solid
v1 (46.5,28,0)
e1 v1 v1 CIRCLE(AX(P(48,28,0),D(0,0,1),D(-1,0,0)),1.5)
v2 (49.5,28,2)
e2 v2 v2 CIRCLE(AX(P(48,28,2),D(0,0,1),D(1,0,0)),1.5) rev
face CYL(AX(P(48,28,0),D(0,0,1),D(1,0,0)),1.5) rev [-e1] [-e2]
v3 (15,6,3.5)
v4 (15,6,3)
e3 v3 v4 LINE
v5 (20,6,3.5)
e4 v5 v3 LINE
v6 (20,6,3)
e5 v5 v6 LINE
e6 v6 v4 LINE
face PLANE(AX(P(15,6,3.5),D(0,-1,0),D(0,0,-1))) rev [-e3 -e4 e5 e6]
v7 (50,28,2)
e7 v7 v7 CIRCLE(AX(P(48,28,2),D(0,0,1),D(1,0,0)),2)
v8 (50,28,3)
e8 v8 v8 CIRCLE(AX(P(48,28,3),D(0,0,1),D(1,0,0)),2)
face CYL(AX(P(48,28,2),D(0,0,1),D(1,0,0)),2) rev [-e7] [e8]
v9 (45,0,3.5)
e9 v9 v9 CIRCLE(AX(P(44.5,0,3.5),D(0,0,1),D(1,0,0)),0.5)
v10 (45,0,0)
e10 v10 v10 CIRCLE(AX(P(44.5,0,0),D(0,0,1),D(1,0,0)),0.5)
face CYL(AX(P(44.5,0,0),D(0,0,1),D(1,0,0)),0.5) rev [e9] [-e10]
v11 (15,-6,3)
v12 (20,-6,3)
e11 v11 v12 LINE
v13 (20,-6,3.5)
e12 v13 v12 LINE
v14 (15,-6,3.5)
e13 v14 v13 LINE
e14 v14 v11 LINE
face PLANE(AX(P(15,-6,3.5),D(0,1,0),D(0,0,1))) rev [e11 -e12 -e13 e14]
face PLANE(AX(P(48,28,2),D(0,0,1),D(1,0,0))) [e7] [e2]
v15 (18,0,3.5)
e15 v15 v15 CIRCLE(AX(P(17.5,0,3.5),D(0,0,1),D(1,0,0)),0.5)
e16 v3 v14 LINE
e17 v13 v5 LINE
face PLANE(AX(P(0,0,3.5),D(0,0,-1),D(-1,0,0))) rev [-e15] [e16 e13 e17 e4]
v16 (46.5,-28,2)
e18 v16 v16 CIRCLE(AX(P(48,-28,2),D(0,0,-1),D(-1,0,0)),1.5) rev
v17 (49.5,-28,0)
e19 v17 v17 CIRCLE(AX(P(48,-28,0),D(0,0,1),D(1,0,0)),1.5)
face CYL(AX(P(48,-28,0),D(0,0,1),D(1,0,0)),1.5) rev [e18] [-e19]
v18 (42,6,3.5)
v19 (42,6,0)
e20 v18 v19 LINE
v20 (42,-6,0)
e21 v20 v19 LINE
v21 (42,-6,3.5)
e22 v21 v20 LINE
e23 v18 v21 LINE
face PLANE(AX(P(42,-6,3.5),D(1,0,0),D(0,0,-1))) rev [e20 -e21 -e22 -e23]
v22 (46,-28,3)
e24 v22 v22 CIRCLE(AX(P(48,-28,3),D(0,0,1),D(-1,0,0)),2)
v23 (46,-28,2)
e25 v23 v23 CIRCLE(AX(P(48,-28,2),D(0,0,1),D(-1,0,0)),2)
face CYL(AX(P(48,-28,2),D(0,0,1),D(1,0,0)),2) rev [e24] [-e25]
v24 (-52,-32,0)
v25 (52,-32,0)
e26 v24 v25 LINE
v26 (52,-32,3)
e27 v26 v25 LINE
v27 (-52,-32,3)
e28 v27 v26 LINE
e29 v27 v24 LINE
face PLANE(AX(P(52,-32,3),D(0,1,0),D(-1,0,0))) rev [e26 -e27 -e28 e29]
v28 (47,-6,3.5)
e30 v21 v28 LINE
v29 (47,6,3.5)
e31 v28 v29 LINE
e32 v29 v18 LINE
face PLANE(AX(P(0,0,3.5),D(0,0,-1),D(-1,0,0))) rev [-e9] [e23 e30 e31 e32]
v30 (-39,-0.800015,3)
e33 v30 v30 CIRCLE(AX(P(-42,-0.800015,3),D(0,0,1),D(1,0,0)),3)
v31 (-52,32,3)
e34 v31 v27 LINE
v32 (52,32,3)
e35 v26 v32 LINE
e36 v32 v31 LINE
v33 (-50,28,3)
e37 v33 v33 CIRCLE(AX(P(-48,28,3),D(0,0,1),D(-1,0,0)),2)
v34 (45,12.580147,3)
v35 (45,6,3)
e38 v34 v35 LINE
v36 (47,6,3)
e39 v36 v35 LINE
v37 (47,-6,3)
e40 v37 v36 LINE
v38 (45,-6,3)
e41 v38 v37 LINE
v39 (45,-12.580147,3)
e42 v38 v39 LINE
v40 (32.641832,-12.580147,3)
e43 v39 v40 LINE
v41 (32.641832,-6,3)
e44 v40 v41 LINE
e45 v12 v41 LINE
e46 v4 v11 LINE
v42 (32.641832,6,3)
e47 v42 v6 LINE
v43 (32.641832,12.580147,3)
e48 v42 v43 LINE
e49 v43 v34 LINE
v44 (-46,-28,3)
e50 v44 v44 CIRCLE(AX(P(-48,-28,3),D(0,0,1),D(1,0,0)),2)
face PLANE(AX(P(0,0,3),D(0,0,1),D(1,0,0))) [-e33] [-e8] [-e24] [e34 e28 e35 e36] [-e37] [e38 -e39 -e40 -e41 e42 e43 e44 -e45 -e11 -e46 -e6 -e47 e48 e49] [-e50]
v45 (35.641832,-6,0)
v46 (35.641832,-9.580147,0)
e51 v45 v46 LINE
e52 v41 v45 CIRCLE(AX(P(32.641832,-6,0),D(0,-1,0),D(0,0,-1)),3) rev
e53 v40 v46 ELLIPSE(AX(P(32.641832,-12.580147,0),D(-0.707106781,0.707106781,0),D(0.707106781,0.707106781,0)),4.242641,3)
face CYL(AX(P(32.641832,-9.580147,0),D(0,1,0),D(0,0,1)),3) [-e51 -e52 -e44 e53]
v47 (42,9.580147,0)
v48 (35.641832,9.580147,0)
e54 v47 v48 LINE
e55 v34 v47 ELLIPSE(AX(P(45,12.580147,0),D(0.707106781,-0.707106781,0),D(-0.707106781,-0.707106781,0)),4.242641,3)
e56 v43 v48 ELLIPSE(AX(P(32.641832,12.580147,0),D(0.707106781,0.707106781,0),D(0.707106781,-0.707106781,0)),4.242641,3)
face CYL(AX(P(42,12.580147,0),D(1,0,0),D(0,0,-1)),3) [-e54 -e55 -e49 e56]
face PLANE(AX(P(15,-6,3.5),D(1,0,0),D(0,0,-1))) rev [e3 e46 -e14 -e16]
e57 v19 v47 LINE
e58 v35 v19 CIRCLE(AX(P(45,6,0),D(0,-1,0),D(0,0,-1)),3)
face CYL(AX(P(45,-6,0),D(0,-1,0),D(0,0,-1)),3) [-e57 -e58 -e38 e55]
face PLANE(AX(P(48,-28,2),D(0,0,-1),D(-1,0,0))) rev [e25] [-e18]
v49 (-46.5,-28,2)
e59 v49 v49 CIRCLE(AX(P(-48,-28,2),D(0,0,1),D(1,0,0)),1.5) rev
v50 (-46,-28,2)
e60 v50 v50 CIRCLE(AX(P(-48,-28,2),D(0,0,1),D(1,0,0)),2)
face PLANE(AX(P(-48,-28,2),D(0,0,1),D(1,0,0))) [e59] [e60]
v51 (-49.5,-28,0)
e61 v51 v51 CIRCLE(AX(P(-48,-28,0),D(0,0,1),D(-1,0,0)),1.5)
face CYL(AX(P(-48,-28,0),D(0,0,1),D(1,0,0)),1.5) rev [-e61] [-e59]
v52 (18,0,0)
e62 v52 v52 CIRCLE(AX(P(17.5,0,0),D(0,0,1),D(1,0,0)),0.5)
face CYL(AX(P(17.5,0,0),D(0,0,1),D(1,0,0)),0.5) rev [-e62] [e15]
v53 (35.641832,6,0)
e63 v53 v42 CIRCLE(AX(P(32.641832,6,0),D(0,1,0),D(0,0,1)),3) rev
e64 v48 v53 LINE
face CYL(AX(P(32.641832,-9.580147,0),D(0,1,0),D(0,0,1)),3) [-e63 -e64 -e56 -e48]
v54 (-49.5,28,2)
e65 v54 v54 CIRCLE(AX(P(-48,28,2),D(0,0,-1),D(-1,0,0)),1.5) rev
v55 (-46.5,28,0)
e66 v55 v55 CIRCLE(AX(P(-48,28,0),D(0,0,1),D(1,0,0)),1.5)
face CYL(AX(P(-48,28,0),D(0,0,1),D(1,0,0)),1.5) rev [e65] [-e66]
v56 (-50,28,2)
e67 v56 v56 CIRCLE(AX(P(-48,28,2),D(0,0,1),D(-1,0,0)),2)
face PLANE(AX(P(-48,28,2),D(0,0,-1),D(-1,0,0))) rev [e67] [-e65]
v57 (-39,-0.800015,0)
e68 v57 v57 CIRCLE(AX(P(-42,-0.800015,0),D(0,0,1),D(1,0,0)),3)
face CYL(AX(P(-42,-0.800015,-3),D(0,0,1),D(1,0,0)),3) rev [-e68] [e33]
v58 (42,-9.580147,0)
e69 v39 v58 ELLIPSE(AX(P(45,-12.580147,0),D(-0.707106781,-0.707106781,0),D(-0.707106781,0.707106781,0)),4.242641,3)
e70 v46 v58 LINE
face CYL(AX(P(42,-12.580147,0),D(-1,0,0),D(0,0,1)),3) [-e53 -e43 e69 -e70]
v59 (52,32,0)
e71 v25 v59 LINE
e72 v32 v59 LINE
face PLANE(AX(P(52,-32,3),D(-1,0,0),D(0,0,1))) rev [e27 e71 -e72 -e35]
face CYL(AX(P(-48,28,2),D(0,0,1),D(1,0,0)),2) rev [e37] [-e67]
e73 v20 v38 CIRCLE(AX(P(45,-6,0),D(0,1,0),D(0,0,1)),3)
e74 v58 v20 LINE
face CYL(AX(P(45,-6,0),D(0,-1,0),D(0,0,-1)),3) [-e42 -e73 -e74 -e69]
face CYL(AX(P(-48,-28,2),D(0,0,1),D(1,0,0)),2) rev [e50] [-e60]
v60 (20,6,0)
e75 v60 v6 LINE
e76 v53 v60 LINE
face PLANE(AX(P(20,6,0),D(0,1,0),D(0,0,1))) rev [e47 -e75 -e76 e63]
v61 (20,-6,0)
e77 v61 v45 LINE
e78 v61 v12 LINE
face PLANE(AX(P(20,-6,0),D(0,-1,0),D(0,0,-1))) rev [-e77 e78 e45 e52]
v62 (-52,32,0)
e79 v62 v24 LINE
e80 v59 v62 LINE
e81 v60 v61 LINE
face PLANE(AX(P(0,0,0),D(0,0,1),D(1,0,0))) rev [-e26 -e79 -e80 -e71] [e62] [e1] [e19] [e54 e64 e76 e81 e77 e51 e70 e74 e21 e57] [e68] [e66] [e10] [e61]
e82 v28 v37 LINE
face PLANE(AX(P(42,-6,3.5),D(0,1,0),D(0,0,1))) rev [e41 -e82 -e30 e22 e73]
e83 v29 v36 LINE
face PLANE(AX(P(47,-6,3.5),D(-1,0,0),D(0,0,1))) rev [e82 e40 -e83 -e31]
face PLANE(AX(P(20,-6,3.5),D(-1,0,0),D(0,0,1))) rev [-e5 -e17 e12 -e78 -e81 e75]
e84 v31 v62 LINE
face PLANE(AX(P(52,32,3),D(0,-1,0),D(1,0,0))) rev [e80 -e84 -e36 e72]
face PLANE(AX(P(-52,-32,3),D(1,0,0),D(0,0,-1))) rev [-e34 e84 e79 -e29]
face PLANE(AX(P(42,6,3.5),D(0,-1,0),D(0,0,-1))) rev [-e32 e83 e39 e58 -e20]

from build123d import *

# Parameters (mm, degrees)
SKETCH_1_W           = 104
SKETCH_1_H           = 64
EXTRUDE_1_DEPTH      = 3
SKETCH_2_R           = 1.5
CUT_EXTRUDE_1_DEPTH  = 62.131006862
SKETCH_4_R           = 2
CUT_EXTRUDE_3_DEPTH  = 1
SKETCH_12_W          = 5
SKETCH_12_H          = 12
EXTRUDE_4_DEPTH      = 0.5
SKETCH_13_R          = 0.5
CUT_EXTRUDE_8_DEPTH  = 62.15758334
SKETCH_15_W          = 22
SKETCH_15_H          = 12
CUT_EXTRUDE_10_DEPTH = 62.131006862
SKETCH_17_W          = 6.358168499
SKETCH_17_H          = 19.16029301
CUT_EXTRUDE_11_DEPTH = 4
FILLET_2_R           = 3
SKETCH_18_R          = 3
CUT_EXTRUDE_12_DEPTH = 6


with BuildPart() as part:
    # 草图1 → 凸台-拉伸1 (new body)
    with BuildSketch(Plane.XY):
        Rectangle(SKETCH_1_W, SKETCH_1_H)
    extrude(amount=EXTRUDE_1_DEPTH)

    # 草图2 → 切除-拉伸1 (cut, through all)
    with BuildSketch(Plane.XY.offset(3)):
        with Locations((-48, 28)):
            Circle(SKETCH_2_R)
        with Locations(Location((48, 28, 0), (0, 0, 180))):
            Circle(SKETCH_2_R)
        with Locations((48, -28)):
            Circle(SKETCH_2_R)
        with Locations(Location((-48, -28, 0), (0, 0, 180))):
            Circle(SKETCH_2_R)
    extrude(amount=-CUT_EXTRUDE_1_DEPTH, mode=Mode.SUBTRACT)

    # 草图4 → 切除-拉伸3 (cut)
    with BuildSketch(Plane.XY.offset(3)):
        with Locations((48, 28)):
            Circle(SKETCH_4_R)
        with Locations(Location((-48, 28, 0), (0, 0, 180))):
            Circle(SKETCH_4_R)
        with Locations((-48, -28)):
            Circle(SKETCH_4_R)
        with Locations(Location((48, -28, 0), (0, 0, 180))):
            Circle(SKETCH_4_R)
    extrude(amount=-CUT_EXTRUDE_3_DEPTH, mode=Mode.SUBTRACT)

    # 草图12 → 凸台-拉伸4 (add)
    with BuildSketch(Plane.XY.offset(3)):
        with Locations((17.5, 0)):
            Rectangle(SKETCH_12_W, SKETCH_12_H)
        with Locations((44.5, 0)):
            Rectangle(SKETCH_12_W, SKETCH_12_H)
    extrude(amount=EXTRUDE_4_DEPTH)

    # 草图13 → 切除-拉伸8 (cut, through all)
    with BuildSketch(Plane.XY.offset(3.5)):
        with Locations((17.5, 0)):
            Circle(SKETCH_13_R)
        with Locations((44.5, 0)):
            Circle(SKETCH_13_R)
    extrude(amount=-CUT_EXTRUDE_8_DEPTH, mode=Mode.SUBTRACT)

    # 草图15 → 切除-拉伸10 (cut, through all)
    with BuildSketch(Plane.XY.offset(3)):
        with Locations((31, 0)):
            Rectangle(SKETCH_15_W, SKETCH_15_H)
    extrude(amount=-CUT_EXTRUDE_10_DEPTH, mode=Mode.SUBTRACT)

    # 草图17 → 切除-拉伸11 (cut)
    with BuildSketch(Plane.XY.offset(3)):
        with Locations((38.820915751, 0)):
            Rectangle(SKETCH_17_W, SKETCH_17_H)
    extrude(amount=-CUT_EXTRUDE_11_DEPTH, mode=Mode.SUBTRACT)

    # 圆角2
    fillet_2_edges = [part.edges().sort_by_distance(p)[0] for p in [
        (35.641831501, -7.790073253, 3),
        (38.82091575, -9.580146505, 3),
        (42, -7.790073253, 3),
        (42, 7.790073253, 3),
        (38.82091575, 9.580146505, 3),
        (35.641831501, 7.790073253, 3),
    ]]
    fillet(fillet_2_edges, radius=FILLET_2_R - 0.0001)  # a hair under: the kernel refuses the full size

    # 草图18 → 切除-拉伸12 (cut)
    with BuildSketch(Plane.XY.offset(3)):
        with Locations((-42, -0.800014708)):
            Circle(SKETCH_18_R)
    extrude(amount=-CUT_EXTRUDE_12_DEPTH, mode=Mode.SUBTRACT)


solid = part.part
